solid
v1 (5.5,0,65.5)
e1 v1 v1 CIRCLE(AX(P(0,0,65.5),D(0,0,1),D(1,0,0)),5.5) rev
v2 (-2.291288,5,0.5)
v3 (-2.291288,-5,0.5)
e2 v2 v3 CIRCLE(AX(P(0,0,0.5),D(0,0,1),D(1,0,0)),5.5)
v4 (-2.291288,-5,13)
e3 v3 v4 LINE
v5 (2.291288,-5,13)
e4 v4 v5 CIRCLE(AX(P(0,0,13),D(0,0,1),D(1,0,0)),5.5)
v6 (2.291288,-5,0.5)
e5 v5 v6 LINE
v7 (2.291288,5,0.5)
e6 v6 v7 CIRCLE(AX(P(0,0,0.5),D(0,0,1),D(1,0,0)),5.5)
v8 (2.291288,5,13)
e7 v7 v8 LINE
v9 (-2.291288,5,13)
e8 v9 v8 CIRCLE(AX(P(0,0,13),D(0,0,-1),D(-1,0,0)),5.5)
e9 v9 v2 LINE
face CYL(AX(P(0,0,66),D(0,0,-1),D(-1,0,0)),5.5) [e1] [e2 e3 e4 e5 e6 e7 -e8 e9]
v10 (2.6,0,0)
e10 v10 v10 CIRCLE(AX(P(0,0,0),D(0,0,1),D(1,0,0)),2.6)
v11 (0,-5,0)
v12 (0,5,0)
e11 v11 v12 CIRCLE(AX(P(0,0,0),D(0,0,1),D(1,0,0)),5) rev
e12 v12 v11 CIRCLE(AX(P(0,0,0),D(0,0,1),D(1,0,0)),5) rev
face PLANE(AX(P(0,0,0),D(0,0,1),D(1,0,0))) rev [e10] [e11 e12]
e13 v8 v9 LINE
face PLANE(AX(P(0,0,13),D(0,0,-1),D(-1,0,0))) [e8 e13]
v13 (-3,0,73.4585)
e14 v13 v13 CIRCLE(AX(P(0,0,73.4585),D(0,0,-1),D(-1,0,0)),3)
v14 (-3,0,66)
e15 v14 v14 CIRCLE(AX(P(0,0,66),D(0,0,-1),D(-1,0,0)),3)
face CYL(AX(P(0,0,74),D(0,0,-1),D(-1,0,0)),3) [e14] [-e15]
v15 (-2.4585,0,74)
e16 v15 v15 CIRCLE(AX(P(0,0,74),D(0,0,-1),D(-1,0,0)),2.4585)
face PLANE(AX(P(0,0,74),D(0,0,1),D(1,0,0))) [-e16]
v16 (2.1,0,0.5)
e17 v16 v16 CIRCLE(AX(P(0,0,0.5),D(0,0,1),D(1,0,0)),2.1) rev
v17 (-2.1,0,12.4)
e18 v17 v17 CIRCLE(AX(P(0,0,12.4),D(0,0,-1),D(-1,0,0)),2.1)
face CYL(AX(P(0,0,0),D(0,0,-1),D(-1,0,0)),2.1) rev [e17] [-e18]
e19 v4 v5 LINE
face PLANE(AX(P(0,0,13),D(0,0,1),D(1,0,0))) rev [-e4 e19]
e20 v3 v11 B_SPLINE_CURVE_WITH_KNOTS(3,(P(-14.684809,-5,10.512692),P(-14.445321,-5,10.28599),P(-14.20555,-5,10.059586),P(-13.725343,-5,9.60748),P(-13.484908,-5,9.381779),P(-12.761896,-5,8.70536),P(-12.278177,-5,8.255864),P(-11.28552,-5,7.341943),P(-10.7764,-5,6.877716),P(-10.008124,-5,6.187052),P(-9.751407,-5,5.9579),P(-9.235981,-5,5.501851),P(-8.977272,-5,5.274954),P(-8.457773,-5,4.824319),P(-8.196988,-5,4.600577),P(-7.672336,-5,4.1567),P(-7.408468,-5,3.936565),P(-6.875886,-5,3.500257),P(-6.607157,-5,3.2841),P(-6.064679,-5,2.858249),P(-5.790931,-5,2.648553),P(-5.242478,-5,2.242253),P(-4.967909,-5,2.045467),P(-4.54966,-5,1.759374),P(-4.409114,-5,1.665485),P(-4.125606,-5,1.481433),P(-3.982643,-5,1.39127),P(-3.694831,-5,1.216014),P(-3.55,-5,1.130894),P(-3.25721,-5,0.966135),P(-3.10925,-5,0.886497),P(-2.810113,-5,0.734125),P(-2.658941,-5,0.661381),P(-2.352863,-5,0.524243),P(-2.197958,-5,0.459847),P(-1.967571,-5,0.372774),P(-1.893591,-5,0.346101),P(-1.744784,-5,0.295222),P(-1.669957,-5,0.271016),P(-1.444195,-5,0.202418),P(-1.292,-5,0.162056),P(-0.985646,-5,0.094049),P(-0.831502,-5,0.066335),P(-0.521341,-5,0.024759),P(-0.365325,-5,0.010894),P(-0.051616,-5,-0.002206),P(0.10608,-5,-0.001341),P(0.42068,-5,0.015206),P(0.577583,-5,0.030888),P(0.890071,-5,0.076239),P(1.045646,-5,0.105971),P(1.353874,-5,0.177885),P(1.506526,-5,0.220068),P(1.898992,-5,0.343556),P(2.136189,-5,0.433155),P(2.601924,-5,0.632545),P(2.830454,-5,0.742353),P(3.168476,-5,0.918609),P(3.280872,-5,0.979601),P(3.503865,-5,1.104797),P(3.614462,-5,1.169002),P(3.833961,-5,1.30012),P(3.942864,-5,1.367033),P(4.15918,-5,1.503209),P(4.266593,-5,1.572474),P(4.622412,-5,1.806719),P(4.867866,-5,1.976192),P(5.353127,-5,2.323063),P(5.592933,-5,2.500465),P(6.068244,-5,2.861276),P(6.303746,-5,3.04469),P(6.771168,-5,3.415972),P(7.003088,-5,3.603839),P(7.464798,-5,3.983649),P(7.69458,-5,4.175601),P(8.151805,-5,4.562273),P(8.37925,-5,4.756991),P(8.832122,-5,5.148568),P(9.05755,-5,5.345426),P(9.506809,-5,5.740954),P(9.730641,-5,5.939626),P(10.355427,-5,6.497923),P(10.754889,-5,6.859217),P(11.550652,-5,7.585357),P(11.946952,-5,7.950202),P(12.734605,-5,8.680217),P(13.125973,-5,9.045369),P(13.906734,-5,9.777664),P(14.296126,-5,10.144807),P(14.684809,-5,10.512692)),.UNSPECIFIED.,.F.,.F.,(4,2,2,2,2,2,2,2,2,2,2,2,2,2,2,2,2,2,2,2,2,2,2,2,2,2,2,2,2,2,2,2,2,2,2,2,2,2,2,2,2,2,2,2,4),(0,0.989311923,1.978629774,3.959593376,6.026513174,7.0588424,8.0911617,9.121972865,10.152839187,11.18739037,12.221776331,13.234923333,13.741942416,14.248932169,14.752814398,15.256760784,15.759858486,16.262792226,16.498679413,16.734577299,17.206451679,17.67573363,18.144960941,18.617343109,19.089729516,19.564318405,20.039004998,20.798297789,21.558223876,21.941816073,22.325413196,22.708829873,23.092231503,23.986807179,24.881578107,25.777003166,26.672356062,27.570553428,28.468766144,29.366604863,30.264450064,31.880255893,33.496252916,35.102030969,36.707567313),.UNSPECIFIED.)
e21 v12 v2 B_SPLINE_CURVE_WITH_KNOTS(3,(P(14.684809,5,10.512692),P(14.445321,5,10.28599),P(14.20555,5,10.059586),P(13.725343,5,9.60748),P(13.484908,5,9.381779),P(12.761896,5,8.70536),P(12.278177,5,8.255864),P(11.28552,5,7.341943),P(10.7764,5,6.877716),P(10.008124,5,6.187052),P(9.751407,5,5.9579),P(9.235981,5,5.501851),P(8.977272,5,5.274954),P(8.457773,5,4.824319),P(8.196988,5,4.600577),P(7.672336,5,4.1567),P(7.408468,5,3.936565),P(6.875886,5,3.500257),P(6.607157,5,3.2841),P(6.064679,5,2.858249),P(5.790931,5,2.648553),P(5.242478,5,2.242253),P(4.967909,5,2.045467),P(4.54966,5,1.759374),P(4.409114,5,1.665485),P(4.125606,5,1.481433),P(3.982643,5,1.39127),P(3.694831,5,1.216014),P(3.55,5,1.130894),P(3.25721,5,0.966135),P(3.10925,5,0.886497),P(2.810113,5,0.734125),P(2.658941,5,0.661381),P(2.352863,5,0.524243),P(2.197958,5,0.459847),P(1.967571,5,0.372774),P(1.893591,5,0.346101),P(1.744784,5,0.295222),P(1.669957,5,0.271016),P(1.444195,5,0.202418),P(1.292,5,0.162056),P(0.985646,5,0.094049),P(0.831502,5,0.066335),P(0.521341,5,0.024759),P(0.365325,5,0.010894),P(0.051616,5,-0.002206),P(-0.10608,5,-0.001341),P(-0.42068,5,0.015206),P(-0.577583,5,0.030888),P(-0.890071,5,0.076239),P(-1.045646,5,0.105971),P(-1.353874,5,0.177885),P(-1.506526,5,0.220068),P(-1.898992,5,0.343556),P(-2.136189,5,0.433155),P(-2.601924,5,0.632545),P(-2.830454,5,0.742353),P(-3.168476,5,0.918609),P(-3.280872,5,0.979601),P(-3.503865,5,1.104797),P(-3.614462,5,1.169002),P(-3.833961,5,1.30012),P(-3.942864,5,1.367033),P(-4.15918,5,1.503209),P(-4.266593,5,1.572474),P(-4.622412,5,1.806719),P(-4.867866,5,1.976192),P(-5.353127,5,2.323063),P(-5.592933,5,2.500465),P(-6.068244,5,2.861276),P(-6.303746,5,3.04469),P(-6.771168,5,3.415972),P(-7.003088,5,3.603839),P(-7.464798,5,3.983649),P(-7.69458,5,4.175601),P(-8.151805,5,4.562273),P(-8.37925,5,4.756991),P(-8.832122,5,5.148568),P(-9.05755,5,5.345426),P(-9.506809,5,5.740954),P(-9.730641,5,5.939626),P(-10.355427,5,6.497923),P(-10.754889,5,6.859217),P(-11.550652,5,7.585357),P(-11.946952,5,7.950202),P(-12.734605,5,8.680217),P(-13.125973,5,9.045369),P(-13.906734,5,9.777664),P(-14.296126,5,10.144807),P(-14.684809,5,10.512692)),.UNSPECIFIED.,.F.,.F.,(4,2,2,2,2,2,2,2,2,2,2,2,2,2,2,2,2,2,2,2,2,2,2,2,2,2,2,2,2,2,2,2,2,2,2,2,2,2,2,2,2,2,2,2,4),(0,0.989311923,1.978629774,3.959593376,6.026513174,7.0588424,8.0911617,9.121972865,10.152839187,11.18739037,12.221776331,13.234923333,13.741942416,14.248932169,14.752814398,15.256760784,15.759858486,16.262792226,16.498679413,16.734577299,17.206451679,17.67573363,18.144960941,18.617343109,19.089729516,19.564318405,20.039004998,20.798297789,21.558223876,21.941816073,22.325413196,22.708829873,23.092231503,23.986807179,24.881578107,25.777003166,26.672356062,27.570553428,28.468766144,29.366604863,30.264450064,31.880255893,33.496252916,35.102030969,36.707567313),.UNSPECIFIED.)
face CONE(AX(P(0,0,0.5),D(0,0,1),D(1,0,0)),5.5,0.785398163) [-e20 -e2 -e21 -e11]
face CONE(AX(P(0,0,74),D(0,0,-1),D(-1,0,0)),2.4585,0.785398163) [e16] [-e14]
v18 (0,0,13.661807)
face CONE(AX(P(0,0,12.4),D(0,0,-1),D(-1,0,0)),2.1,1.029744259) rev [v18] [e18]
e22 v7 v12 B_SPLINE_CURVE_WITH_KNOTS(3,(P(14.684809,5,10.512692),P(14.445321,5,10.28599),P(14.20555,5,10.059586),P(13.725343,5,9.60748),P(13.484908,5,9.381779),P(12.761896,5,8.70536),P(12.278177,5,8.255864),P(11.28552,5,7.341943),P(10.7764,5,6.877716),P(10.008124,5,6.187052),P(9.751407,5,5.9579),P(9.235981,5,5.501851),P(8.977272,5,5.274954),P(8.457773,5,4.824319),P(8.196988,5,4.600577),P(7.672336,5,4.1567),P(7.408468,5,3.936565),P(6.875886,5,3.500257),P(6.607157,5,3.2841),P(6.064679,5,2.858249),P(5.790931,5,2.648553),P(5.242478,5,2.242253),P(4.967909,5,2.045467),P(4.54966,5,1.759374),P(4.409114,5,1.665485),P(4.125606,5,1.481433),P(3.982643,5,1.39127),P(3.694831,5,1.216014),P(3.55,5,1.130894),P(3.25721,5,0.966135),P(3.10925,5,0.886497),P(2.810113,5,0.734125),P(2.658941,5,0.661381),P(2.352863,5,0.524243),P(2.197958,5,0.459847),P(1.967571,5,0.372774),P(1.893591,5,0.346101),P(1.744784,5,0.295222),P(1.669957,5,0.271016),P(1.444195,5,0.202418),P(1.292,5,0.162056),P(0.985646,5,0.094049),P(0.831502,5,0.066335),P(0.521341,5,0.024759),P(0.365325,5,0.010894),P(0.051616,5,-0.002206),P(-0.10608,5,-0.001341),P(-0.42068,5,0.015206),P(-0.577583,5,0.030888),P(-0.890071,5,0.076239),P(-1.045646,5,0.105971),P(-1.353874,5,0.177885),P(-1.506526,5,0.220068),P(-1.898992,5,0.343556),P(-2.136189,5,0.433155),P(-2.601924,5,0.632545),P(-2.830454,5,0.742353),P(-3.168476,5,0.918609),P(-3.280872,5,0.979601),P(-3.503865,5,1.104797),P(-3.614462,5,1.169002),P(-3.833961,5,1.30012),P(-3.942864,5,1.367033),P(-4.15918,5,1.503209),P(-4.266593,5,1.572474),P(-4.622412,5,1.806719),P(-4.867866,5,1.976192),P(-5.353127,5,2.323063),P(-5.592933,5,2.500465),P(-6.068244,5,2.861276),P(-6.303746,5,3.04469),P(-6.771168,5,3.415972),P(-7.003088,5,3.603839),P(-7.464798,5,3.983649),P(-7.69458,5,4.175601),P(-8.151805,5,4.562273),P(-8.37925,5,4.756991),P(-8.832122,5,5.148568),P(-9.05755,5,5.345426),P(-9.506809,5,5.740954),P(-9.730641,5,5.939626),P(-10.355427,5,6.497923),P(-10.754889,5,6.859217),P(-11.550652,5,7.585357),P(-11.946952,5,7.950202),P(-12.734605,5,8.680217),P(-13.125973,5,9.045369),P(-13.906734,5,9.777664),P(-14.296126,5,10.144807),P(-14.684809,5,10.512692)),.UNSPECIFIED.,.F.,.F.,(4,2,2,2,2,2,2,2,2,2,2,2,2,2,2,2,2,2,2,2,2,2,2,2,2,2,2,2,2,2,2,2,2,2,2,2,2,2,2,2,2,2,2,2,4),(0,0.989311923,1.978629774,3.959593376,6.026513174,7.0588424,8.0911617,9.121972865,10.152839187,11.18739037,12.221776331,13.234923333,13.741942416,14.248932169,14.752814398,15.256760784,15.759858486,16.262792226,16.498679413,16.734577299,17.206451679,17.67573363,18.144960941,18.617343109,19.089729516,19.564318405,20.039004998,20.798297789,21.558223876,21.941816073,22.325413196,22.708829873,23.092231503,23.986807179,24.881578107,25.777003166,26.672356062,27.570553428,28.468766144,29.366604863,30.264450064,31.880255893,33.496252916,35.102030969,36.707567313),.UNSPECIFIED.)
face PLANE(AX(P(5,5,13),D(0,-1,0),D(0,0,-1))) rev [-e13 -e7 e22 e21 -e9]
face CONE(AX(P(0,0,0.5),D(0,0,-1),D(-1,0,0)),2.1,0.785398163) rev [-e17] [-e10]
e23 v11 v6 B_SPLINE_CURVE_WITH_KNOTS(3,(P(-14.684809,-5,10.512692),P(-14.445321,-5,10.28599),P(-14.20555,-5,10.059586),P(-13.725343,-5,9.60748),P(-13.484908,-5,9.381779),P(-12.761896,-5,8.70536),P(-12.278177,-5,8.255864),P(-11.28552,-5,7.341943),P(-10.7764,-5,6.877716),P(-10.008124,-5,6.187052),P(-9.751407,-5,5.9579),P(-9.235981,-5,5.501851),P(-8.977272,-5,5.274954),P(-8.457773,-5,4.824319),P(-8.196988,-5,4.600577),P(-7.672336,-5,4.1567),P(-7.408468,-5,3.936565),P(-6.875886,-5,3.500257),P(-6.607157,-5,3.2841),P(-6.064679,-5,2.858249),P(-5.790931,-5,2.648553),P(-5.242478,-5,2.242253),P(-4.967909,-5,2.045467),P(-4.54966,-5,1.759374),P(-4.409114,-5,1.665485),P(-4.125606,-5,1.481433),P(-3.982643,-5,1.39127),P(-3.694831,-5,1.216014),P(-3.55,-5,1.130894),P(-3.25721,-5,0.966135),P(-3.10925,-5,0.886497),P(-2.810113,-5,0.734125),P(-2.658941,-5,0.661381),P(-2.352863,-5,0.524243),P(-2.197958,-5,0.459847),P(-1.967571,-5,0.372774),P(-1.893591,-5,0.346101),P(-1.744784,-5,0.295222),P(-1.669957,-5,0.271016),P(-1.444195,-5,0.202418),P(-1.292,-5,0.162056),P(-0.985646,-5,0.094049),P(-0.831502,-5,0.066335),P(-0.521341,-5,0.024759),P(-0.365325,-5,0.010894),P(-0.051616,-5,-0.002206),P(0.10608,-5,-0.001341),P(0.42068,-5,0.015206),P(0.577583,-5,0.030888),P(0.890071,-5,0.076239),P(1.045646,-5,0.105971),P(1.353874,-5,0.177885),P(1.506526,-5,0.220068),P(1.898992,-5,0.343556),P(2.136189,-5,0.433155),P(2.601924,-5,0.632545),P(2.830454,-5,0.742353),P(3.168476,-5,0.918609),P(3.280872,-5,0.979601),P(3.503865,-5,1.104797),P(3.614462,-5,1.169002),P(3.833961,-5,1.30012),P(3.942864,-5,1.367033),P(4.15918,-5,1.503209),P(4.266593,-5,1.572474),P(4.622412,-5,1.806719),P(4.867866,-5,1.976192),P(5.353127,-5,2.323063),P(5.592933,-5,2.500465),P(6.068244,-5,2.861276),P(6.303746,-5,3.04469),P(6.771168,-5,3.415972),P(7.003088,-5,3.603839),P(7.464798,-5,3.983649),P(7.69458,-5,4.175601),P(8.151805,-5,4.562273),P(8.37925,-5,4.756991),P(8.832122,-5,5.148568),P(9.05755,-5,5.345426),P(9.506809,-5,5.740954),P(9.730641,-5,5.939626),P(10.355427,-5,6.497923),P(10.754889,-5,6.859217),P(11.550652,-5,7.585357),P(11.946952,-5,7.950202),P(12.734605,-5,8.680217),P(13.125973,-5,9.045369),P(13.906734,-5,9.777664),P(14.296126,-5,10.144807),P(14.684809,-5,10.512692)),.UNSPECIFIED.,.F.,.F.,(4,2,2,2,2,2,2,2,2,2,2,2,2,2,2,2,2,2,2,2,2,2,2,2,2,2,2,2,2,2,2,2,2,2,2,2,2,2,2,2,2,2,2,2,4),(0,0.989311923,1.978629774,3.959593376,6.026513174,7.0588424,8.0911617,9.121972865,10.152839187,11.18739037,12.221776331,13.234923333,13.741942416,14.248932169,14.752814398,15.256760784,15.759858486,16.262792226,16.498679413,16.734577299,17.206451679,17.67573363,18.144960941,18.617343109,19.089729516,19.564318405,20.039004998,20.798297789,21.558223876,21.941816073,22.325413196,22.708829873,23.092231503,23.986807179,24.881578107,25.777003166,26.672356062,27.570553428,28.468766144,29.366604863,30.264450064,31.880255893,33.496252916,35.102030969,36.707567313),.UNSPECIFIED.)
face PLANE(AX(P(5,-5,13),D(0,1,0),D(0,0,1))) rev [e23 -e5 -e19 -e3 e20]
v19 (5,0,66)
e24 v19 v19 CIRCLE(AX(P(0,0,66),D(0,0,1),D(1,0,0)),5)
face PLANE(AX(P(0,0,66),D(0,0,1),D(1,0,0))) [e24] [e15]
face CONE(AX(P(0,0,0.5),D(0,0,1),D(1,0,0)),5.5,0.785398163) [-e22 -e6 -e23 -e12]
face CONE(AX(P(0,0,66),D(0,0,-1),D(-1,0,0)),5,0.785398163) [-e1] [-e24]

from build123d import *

# Parameters (mm, degrees)
SKETCH_1_R             = 5.5
EXTRUDE_1_DEPTH        = 66
CHAMFER_1_SIZE         = 0.5
SKETCH_2_R             = 3.3
EXTRUDE_2_DEPTH        = 8
HOLE_WIZARD_M5_1_D     = 4.2
HOLE_WIZARD_M5_1_DEPTH = 12.4
HOLE_WIZARD_M5_1_TIP   = 1.2618073
CHAMFER_3_SIZE         = 0.5
SKETCH_6_W             = 10
SKETCH_6_H             = 3
CUT_EXTRUDE_1_DEPTH    = 13


# Read off the part's stored shape, not the designer's step: M6 机械螺纹 螺柱1
with BuildPart() as part:
    # 草图1 → 拉伸1 (new body)
    with BuildSketch(Plane.XY):
        Circle(SKETCH_1_R)
    extrude(amount=EXTRUDE_1_DEPTH)

    # 倒角1
    chamfer_1_edges = [part.edges().sort_by_distance(p)[0] for p in [
        (-5.5, 0, 0),
        (-5.5, 0, 66),
    ]]
    chamfer(chamfer_1_edges, length=CHAMFER_1_SIZE)

    # 草图2 → 拉伸2 (add)
    with BuildSketch(Plane.XY.offset(66)):
        Circle(SKETCH_2_R)
    extrude(amount=EXTRUDE_2_DEPTH)

    # M5 螺纹孔1
    with Locations(Plane(origin=(0, 0, 0), x_dir=(-1, 0, 0), z_dir=(0, 0, -1))):
        with Locations((0, 0)):
            Hole(HOLE_WIZARD_M5_1_D / 2, depth=HOLE_WIZARD_M5_1_DEPTH)
            with Locations((0, 0, -(HOLE_WIZARD_M5_1_DEPTH + HOLE_WIZARD_M5_1_TIP / 2))):  # 118° drill point
                Cone(0, HOLE_WIZARD_M5_1_D / 2, HOLE_WIZARD_M5_1_TIP, mode=Mode.SUBTRACT)

    # 倒角3
    chamfer_3_edges = [part.edges().sort_by_distance(p)[0] for p in [
        (-2.1, 0, 0),
    ]]
    chamfer(chamfer_3_edges, length=CHAMFER_3_SIZE)

    # 草图6 → 切除-拉伸1 (cut)
    with BuildSketch(Plane(origin=(0, 0, 0), x_dir=(-1, 0, 0), z_dir=(0, 0, -1))):
        with Locations((0, 6.5)):
            Rectangle(SKETCH_6_W, SKETCH_6_H)
        with Locations((0, -6.5)):
            Rectangle(SKETCH_6_W, SKETCH_6_H)
    extrude(amount=-CUT_EXTRUDE_1_DEPTH, mode=Mode.SUBTRACT)

    # M6 机械螺纹 螺柱1 outline → M6 机械螺纹 螺柱1 (revolve, cut)
    with BuildSketch(Plane.XZ):
        Polygon((3.3, 74), (2.4585, 74), (3, 73.4585), (3, 66), (3.3, 66), align=None)
    revolve(axis=Axis((0, 0, 0), (0, 0, 1)), mode=Mode.SUBTRACT)


solid = part.part
